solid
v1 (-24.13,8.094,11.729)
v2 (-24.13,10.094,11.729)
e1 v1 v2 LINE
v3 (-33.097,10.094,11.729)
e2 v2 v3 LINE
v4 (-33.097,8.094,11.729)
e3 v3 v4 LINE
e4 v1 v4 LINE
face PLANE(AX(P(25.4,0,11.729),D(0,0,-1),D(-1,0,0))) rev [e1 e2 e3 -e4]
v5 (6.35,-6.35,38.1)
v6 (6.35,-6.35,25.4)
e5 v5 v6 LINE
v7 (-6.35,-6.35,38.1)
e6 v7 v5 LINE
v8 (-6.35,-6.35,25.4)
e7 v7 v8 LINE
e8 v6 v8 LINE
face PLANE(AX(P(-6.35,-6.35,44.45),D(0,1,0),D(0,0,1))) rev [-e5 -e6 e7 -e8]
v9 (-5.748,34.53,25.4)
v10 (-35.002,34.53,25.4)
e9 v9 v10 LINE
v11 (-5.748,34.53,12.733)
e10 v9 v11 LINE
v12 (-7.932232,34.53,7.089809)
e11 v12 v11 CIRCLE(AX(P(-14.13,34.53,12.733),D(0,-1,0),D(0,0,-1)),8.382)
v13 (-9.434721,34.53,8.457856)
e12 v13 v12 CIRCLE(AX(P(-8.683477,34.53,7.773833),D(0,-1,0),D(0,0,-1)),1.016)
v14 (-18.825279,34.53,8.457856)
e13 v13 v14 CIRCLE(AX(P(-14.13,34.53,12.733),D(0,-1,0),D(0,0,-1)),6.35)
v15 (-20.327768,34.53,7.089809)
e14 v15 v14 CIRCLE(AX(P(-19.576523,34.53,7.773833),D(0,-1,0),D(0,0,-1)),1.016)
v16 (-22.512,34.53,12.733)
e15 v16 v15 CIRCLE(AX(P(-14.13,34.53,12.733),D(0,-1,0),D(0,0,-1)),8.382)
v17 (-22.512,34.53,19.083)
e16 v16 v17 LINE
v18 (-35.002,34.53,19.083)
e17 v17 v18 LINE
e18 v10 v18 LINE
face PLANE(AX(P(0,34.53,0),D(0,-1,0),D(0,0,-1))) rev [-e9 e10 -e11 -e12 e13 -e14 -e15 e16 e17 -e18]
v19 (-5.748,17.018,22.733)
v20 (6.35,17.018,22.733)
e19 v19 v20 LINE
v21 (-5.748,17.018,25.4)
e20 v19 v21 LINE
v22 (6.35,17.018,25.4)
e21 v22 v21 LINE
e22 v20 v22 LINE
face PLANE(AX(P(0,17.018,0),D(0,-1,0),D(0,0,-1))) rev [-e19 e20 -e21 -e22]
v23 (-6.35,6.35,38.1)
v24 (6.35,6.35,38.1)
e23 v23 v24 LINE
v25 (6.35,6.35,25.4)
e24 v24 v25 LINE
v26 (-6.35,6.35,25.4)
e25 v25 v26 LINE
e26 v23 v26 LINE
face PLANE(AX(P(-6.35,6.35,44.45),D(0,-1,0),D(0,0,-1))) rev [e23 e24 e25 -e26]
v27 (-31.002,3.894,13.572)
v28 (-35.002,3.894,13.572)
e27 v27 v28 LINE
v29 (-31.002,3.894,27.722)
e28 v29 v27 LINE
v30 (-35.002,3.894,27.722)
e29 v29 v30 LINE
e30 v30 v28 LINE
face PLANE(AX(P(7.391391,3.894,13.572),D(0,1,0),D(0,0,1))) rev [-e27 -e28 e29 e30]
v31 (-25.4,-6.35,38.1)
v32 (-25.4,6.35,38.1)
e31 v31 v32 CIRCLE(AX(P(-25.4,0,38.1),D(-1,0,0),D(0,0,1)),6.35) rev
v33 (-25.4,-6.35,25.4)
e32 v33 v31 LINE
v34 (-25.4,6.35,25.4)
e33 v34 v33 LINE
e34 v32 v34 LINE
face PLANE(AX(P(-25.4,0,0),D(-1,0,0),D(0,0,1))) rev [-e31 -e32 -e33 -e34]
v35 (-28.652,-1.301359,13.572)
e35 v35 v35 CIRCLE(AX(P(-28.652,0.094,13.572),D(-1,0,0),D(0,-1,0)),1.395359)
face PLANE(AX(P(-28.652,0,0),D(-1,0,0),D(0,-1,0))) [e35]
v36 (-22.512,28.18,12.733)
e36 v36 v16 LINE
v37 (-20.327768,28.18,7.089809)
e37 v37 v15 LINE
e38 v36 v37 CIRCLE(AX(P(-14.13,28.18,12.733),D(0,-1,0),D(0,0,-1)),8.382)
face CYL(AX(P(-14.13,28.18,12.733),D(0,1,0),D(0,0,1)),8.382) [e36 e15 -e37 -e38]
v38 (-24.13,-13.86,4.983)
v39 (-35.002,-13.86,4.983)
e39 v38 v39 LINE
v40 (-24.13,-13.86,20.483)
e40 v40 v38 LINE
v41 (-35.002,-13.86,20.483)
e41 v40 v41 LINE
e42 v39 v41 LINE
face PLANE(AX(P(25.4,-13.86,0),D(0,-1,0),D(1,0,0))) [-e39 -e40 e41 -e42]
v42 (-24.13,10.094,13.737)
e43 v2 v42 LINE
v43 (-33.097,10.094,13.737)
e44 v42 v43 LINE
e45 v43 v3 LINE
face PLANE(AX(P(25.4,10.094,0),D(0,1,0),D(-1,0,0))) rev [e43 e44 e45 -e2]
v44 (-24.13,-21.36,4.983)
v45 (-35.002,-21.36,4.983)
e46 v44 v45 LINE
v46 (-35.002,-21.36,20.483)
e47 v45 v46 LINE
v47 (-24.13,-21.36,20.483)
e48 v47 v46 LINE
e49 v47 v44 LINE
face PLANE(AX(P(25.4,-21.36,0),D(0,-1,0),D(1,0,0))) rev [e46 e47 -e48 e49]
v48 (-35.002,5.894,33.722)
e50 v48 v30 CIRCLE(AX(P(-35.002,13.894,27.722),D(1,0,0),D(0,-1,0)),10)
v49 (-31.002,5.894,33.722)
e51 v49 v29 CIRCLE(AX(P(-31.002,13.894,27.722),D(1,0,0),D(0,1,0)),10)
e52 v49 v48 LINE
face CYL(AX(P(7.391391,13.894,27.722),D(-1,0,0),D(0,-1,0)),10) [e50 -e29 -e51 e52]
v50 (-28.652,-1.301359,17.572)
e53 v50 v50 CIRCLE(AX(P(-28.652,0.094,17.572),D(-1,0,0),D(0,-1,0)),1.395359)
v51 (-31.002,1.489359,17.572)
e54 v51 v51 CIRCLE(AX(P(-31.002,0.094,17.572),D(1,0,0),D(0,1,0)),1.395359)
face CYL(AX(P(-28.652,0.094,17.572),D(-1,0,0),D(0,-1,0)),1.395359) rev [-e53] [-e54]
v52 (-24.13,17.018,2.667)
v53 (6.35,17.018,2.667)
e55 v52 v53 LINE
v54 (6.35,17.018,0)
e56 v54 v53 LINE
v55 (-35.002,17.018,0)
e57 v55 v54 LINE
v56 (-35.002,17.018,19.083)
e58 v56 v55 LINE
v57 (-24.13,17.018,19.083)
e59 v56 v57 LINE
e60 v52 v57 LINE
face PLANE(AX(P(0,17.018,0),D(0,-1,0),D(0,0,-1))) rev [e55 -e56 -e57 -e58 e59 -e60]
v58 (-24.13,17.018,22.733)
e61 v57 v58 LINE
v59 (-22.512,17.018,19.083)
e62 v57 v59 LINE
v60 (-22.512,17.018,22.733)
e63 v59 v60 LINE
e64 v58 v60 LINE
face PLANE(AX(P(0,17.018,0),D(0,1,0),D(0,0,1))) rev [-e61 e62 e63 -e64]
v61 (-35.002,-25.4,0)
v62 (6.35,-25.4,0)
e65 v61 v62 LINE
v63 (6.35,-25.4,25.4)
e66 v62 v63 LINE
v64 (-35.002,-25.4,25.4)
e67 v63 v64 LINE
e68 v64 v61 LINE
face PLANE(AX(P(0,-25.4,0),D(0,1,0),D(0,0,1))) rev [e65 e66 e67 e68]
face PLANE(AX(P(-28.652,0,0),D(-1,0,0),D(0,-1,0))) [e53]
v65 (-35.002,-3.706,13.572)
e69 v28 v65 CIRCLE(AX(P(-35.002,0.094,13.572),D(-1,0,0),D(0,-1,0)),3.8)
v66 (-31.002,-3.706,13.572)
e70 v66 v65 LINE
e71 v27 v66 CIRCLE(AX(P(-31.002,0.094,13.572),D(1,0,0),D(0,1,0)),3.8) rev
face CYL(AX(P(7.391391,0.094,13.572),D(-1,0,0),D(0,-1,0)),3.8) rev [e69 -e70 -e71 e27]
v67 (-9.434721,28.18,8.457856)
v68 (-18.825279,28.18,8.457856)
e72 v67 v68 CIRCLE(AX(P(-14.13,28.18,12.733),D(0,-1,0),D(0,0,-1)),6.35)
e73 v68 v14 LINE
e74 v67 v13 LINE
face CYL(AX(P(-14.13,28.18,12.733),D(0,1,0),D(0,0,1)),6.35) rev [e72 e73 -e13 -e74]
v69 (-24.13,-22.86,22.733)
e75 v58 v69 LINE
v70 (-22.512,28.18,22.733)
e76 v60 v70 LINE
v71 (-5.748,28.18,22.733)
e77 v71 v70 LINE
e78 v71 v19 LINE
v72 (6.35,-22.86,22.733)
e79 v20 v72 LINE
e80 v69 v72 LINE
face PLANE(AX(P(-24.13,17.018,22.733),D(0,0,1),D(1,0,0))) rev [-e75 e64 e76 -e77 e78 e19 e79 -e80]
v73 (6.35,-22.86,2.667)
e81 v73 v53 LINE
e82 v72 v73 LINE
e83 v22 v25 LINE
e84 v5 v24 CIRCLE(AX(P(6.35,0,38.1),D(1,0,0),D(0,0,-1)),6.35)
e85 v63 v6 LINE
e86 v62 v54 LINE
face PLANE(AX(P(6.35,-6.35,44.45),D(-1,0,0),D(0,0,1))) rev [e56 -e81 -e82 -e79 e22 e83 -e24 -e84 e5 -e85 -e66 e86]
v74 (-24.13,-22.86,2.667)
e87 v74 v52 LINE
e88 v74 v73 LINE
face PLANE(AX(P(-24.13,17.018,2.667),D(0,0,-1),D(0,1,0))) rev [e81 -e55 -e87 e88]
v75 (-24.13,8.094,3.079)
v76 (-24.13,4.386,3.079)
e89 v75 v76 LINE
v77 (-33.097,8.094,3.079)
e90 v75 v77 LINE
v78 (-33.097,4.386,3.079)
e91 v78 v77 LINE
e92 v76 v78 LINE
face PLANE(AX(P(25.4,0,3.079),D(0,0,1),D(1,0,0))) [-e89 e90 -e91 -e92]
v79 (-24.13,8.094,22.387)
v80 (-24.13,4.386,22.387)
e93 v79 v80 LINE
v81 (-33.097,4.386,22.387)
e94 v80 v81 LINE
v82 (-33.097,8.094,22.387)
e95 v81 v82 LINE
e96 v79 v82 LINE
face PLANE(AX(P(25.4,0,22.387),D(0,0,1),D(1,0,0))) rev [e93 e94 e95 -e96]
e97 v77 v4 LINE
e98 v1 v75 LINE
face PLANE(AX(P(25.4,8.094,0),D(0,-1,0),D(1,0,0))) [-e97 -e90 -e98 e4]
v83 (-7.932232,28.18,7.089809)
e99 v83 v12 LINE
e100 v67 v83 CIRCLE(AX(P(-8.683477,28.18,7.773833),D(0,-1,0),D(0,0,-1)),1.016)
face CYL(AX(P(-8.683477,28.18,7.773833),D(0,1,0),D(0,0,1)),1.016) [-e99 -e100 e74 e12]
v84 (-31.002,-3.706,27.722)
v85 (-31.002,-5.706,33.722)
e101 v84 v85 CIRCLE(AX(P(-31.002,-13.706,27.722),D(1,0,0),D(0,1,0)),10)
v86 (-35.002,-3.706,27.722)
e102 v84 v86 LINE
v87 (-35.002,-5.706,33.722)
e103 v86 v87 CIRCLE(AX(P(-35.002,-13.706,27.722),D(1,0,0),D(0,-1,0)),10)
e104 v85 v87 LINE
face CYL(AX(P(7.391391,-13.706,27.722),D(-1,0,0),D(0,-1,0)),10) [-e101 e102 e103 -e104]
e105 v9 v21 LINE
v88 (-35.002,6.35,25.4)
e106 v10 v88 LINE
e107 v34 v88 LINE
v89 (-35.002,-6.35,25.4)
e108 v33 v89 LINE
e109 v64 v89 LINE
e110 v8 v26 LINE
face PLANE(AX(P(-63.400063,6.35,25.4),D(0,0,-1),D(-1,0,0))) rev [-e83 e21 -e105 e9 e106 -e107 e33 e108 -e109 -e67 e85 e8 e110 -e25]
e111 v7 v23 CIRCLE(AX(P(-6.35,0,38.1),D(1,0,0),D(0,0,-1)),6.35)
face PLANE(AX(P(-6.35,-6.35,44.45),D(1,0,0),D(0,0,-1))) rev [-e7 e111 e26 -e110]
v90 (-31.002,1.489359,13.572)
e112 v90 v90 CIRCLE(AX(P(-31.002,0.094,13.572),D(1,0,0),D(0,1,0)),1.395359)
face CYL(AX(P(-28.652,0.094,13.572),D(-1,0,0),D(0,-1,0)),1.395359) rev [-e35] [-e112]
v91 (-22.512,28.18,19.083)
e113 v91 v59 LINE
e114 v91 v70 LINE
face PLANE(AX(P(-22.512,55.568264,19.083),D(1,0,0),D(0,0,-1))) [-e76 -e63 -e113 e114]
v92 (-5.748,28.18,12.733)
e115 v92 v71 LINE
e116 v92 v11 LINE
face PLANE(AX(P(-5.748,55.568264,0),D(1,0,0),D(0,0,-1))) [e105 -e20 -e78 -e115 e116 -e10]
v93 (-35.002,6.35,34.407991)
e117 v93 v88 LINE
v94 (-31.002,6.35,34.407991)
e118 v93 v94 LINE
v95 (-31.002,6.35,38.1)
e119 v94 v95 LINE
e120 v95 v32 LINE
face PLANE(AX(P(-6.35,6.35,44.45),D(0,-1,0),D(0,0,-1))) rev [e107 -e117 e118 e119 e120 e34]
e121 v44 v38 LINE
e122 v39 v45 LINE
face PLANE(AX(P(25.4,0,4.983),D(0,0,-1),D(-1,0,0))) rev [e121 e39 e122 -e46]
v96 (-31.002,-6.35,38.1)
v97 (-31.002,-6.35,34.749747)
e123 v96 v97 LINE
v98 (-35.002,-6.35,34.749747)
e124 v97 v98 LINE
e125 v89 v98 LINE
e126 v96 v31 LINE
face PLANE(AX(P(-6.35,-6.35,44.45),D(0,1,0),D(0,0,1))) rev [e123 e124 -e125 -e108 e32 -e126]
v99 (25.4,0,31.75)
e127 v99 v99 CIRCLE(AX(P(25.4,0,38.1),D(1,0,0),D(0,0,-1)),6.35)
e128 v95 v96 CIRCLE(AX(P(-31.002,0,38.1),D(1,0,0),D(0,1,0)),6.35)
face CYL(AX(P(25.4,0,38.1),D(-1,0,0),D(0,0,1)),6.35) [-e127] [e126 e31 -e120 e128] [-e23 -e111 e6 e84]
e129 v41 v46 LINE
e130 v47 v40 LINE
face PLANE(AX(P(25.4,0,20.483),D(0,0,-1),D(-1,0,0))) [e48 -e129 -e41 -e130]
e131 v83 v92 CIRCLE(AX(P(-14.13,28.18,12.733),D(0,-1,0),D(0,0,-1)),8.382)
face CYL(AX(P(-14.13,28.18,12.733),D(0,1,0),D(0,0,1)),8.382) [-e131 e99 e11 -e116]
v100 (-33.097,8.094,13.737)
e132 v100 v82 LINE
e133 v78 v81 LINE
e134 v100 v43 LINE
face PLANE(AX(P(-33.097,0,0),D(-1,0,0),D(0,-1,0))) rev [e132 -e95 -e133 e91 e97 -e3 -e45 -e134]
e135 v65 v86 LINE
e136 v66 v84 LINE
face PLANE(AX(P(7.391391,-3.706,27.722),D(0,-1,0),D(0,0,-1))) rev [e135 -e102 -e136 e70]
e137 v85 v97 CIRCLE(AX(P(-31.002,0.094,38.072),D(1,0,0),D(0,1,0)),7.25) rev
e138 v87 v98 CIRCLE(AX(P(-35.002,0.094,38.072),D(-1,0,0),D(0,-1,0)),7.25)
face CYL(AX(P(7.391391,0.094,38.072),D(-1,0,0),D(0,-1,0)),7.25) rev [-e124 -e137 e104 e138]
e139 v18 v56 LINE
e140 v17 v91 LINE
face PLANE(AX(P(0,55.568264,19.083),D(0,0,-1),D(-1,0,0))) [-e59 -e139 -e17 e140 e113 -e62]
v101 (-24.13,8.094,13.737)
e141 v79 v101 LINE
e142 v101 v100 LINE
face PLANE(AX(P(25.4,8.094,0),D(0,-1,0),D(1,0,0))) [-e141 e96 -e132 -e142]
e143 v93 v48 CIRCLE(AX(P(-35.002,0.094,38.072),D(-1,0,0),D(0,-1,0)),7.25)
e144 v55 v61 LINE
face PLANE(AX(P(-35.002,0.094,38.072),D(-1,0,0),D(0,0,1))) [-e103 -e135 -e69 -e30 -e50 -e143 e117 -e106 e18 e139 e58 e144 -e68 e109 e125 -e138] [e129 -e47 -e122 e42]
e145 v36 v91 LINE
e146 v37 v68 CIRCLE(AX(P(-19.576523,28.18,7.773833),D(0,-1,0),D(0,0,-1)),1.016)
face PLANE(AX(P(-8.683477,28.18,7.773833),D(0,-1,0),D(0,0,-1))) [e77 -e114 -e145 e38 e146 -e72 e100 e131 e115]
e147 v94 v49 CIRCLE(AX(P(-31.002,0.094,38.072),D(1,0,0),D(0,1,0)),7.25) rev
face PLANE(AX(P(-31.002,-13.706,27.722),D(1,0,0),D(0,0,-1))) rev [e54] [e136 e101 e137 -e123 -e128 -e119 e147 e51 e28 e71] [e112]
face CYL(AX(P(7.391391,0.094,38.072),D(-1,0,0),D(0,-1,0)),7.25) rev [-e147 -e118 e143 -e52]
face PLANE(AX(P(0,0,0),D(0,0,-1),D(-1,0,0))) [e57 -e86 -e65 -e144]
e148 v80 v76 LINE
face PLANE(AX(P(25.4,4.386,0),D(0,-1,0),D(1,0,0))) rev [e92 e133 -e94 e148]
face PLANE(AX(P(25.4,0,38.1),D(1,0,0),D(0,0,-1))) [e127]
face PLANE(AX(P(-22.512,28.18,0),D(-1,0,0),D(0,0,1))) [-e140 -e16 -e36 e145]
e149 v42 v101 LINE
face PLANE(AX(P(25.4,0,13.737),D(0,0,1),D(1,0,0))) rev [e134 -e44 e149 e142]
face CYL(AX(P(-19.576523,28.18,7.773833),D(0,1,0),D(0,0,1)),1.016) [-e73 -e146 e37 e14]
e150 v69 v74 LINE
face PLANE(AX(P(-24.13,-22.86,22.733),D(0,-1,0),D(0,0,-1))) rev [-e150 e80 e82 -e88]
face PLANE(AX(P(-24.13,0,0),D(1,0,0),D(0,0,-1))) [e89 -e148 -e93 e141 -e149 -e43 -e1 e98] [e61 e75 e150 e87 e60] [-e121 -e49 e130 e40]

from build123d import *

# Parameters (mm, degrees)
SKETCH1_W            = 12.7
SKETCH1_H            = 12.7
BOSS_EXTRUDE1_DEPTH  = 44.45
SKETCH2_R            = 6.35
BOSS_EXTRUDE2_DEPTH  = 19.05
SKETCH3_W            = 25.4
SKETCH3_H            = 12.7
BOSS_EXTRUDE3_DEPTH  = 28.652
BOSS_EXTRUDE4_START  = 19.05
SKETCH4_W            = 19.05
SKETCH4_H            = 12.7
BOSS_EXTRUDE4_DEPTH  = 9.602
CUT_EXTRUDE1_START   = -41.352
CUT_EXTRUDE1_DEPTH   = 41.352
BOSS_EXTRUDE5_START  = -31.75
SKETCH2_2_R          = 6.35
BOSS_EXTRUDE5_DEPTH  = 19.05
CUT_EXTRUDE2_START   = -4
SKETCH6_R            = 1.395358984
CUT_EXTRUDE2_DEPTH   = 4
CUT_EXTRUDE4_START   = -6.35
SKETCH6_2_R          = 1.395358984
CUT_EXTRUDE4_DEPTH   = 6.35
SKETCH8_W            = 41.352
SKETCH8_H            = 25.4
BOSS_EXTRUDE6_DEPTH  = 19.05
BOSS_EXTRUDE7_START  = -12.7
SKETCH8_2_W          = 41.352
SKETCH8_2_H          = 25.4
BOSS_EXTRUDE7_DEPTH  = 10.668
SKETCH9_W            = 20.066
SKETCH9_H            = 39.878
CUT_EXTRUDE5_DEPTH   = 30.48
SKETCH11_W           = 16.764
SKETCH11_H           = 2.667
SKETCH11_W_2         = 10.872
SKETCH11_H_2         = 3.65
SKETCH11_W_3         = 1.618
BOSS_EXTRUDE8_DEPTH  = 8.622
BOSS_EXTRUDE9_START  = 8.622
SKETCH11_3_W         = 16.764
SKETCH11_3_H         = 2.667
SKETCH11_3_W_2       = 10.872
SKETCH11_3_H_2       = 3.65
SKETCH11_3_W_3       = 1.618
BOSS_EXTRUDE9_DEPTH  = 8.89
BOSS_EXTRUDE10_START = 17.512
BOSS_EXTRUDE10_DEPTH = 6.35
SKETCH12_W           = 15.5
SKETCH12_H           = 7.5
CUT_EXTRUDE7_DEPTH   = 83.562249267
CUT_EXTRUDE8_START   = -1.905
CUT_EXTRUDE8_DEPTH   = 81.657249267


# Read off the part's stored shape, not the designer's step: Cut-Extrude1
with BuildPart() as part:
    # Sketch1 → Boss-Extrude1 (new body)
    with BuildSketch(Plane.XY):
        Rectangle(SKETCH1_W, SKETCH1_H)
    extrude(amount=BOSS_EXTRUDE1_DEPTH)

    # Sketch2 → Boss-Extrude2 (add)
    with BuildSketch(Plane(origin=(6.35, 0, 0), x_dir=(0, 0, -1), z_dir=(1, 0, 0))):
        with Locations(Location((-38.1, 0, 0), (0, 0, 180))):
            Circle(SKETCH2_R)
    extrude(amount=BOSS_EXTRUDE2_DEPTH)

    # Sketch3 → Boss-Extrude3 (add)
    with BuildSketch(Plane.ZY.offset(6.35)):
        with Locations((12.7, 0)):
            Rectangle(SKETCH3_W, SKETCH3_H)
    extrude(amount=BOSS_EXTRUDE3_DEPTH)

    # Sketch4 → Boss-Extrude4 (add)
    with BuildSketch(Plane.ZY.offset(6.35).offset(BOSS_EXTRUDE4_START)):
        with Locations((34.925, 0)):
            Rectangle(SKETCH4_W, SKETCH4_H)
    extrude(amount=BOSS_EXTRUDE4_DEPTH)

    # Cut-Extrude1 outline → Cut-Extrude1 (cut)
    with BuildSketch(Plane(origin=(6.35, 0, 0), x_dir=(0, 0, -1), z_dir=(1, 0, 0)).offset(CUT_EXTRUDE1_START)):
        with BuildLine():
            ThreePointArc((-44.45, 0), (-42.590128061, 4.490128061), (-38.1, 6.35))
            Line((-38.1, 6.35), (-44.45, 6.35))
            Line((-44.45, 6.35), (-44.45, 0))
        make_face()
        with BuildLine():
            Line((-44.45, -6.35), (-38.1, -6.35))
            ThreePointArc((-38.1, -6.35), (-42.590128061, -4.490128061), (-44.45, 0))
            Line((-44.45, 0), (-44.45, -6.35))
        make_face()
    extrude(amount=CUT_EXTRUDE1_DEPTH, mode=Mode.SUBTRACT)

    # Sketch2<2> → Boss-Extrude5 (add)
    with BuildSketch(Plane(origin=(6.35, 0, 0), x_dir=(0, 0, -1), z_dir=(1, 0, 0)).offset(BOSS_EXTRUDE5_START)):
        with Locations(Location((-38.1, 0, 0), (0, 0, 90))):
            Circle(SKETCH2_2_R)
    extrude(amount=BOSS_EXTRUDE5_DEPTH)

    # Sketch6 → Cut-Extrude2 (cut)
    with BuildSketch(Plane.ZY.offset(35.002).offset(CUT_EXTRUDE2_START)):
        with BuildLine():
            Line((27.722, -3.706), (13.572, -3.706))
            ThreePointArc((13.572, -3.706), (9.772, 0.094), (13.572, 3.894))
            Line((13.572, 3.894), (27.722, 3.894))
            ThreePointArc((27.722, 3.894), (30.88427766, 4.407167019), (33.722, 5.894))
            ThreePointArc((33.722, 5.894), (45.322, 0.094), (33.722, -5.706))
            ThreePointArc((33.722, -5.706), (30.88427766, -4.219167019), (27.722, -3.706))
        make_face()
        with Locations(Location((17.572, 0.094, 0), (0, 0, 270))):
            Circle(SKETCH6_R, mode=Mode.SUBTRACT)
        with Locations(Location((13.572, 0.094, 0), (0, 0, 270))):
            Circle(SKETCH6_R, mode=Mode.SUBTRACT)
    extrude(amount=CUT_EXTRUDE2_DEPTH, mode=Mode.SUBTRACT)

    # Sketch6<2> → Cut-Extrude4 (cut)
    with BuildSketch(Plane.ZY.offset(35.002).offset(CUT_EXTRUDE4_START)):
        with Locations(Location((13.572, 0.094, 0), (0, 0, 270))):
            Circle(SKETCH6_2_R)
        with Locations(Location((17.572, 0.094, 0), (0, 0, 270))):
            Circle(SKETCH6_2_R)
    extrude(amount=CUT_EXTRUDE4_DEPTH, mode=Mode.SUBTRACT)

    # Sketch8 → Boss-Extrude6 (add)
    with BuildSketch(Plane.XZ.offset(6.35)):
        with Locations((-14.326, 12.7)):
            Rectangle(SKETCH8_W, SKETCH8_H)
    extrude(amount=BOSS_EXTRUDE6_DEPTH)

    # Sketch8<2> → Boss-Extrude7 (add)
    with BuildSketch(Plane.XZ.offset(6.35).offset(BOSS_EXTRUDE7_START)):
        with Locations((-14.326, 12.7)):
            Rectangle(SKETCH8_2_W, SKETCH8_2_H)
    extrude(amount=-BOSS_EXTRUDE7_DEPTH)

    # Sketch9 → Cut-Extrude5 (cut)
    with BuildSketch(Plane(origin=(6.35, 0, 0), x_dir=(0, 0, -1), z_dir=(1, 0, 0))):
        with Locations((-12.7, -2.921)):
            Rectangle(SKETCH9_W, SKETCH9_H)
    extrude(amount=-CUT_EXTRUDE5_DEPTH, mode=Mode.SUBTRACT)

    # Sketch11 → Boss-Extrude8 (add)
    with BuildSketch(Plane(origin=(0, 17.018, 0), x_dir=(1, 0, 0), z_dir=(0, 1, 0))):
        with Locations((-14.13, -24.0665)):
            Rectangle(SKETCH11_W, SKETCH11_H)
        Polygon((-22.512, -25.4), (-22.512, -22.733), (-24.13, -22.733), (-35.002, -22.733), (-35.002, -25.4), align=None)
        with Locations((-29.566, -20.908)):
            Rectangle(SKETCH11_W_2, SKETCH11_H_2)
        with Locations((-23.321, -20.908)):
            Rectangle(SKETCH11_W_3, SKETCH11_H_2)
    extrude(amount=BOSS_EXTRUDE8_DEPTH)

    # Sketch11<3> → Boss-Extrude9 (add)
    with BuildSketch(Plane(origin=(0, 17.018, 0), x_dir=(1, 0, 0), z_dir=(0, 1, 0)).offset(BOSS_EXTRUDE9_START)):
        with Locations((-14.13, -24.0665)):
            Rectangle(SKETCH11_3_W, SKETCH11_3_H)
        with Locations((-29.566, -20.908)):
            Rectangle(SKETCH11_3_W_2, SKETCH11_3_H_2)
        Polygon((-22.512, -25.4), (-22.512, -22.733), (-24.13, -22.733), (-35.002, -22.733), (-35.002, -25.4), align=None)
        with Locations((-23.321, -20.908)):
            Rectangle(SKETCH11_3_W_3, SKETCH11_3_H_2)
    extrude(amount=BOSS_EXTRUDE9_DEPTH)

    # Sketch11<4> → Boss-Extrude10 (add)
    with BuildSketch(Plane(origin=(0, 17.018, 0), x_dir=(1, 0, 0), z_dir=(0, 1, 0)).offset(BOSS_EXTRUDE10_START)):
        with BuildLine():
            Line((-5.748, -22.733), (-5.748, -12.733))
            ThreePointArc((-5.748, -12.733), (-6.313107632, -9.707422748), (-7.932232333, -7.089809417))
            ThreePointArc((-7.932232333, -7.089809417), (-9.3675, -7.022587953), (-9.434721465, -8.457855619))
            ThreePointArc((-9.434721465, -8.457855619), (-14.13, -19.083), (-18.825278535, -8.457855619))
            ThreePointArc((-18.825278535, -8.457855619), (-18.8925, -7.022587953), (-20.327767667, -7.089809417))
            ThreePointArc((-20.327767667, -7.089809417), (-21.946892368, -9.707422748), (-22.512, -12.733))
            Line((-22.512, -12.733), (-22.512, -19.083))
            Line((-22.512, -19.083), (-22.512, -22.733))
            Line((-22.512, -22.733), (-5.748, -22.733))
        make_face()
    extrude(amount=-BOSS_EXTRUDE10_DEPTH)

    # Sketch12 → Cut-Extrude7 (cut, through all)
    with BuildSketch(Plane.ZY.offset(35.002)):
        with Locations((12.733, -17.61)):
            Rectangle(SKETCH12_W, SKETCH12_H)
    extrude(amount=-CUT_EXTRUDE7_DEPTH, mode=Mode.SUBTRACT)

    # Sketch12<3> → Cut-Extrude8 (cut, through all)
    with BuildSketch(Plane.ZY.offset(35.002).offset(CUT_EXTRUDE8_START)):
        Polygon((13.737, 8.094), (22.387, 8.094), (22.387, 4.386), (3.079, 4.386), (3.079, 8.094), (11.729, 8.094), (11.729, 10.094), (13.737, 10.094), align=None)
    extrude(amount=-CUT_EXTRUDE8_DEPTH, mode=Mode.SUBTRACT)


solid = part.part
